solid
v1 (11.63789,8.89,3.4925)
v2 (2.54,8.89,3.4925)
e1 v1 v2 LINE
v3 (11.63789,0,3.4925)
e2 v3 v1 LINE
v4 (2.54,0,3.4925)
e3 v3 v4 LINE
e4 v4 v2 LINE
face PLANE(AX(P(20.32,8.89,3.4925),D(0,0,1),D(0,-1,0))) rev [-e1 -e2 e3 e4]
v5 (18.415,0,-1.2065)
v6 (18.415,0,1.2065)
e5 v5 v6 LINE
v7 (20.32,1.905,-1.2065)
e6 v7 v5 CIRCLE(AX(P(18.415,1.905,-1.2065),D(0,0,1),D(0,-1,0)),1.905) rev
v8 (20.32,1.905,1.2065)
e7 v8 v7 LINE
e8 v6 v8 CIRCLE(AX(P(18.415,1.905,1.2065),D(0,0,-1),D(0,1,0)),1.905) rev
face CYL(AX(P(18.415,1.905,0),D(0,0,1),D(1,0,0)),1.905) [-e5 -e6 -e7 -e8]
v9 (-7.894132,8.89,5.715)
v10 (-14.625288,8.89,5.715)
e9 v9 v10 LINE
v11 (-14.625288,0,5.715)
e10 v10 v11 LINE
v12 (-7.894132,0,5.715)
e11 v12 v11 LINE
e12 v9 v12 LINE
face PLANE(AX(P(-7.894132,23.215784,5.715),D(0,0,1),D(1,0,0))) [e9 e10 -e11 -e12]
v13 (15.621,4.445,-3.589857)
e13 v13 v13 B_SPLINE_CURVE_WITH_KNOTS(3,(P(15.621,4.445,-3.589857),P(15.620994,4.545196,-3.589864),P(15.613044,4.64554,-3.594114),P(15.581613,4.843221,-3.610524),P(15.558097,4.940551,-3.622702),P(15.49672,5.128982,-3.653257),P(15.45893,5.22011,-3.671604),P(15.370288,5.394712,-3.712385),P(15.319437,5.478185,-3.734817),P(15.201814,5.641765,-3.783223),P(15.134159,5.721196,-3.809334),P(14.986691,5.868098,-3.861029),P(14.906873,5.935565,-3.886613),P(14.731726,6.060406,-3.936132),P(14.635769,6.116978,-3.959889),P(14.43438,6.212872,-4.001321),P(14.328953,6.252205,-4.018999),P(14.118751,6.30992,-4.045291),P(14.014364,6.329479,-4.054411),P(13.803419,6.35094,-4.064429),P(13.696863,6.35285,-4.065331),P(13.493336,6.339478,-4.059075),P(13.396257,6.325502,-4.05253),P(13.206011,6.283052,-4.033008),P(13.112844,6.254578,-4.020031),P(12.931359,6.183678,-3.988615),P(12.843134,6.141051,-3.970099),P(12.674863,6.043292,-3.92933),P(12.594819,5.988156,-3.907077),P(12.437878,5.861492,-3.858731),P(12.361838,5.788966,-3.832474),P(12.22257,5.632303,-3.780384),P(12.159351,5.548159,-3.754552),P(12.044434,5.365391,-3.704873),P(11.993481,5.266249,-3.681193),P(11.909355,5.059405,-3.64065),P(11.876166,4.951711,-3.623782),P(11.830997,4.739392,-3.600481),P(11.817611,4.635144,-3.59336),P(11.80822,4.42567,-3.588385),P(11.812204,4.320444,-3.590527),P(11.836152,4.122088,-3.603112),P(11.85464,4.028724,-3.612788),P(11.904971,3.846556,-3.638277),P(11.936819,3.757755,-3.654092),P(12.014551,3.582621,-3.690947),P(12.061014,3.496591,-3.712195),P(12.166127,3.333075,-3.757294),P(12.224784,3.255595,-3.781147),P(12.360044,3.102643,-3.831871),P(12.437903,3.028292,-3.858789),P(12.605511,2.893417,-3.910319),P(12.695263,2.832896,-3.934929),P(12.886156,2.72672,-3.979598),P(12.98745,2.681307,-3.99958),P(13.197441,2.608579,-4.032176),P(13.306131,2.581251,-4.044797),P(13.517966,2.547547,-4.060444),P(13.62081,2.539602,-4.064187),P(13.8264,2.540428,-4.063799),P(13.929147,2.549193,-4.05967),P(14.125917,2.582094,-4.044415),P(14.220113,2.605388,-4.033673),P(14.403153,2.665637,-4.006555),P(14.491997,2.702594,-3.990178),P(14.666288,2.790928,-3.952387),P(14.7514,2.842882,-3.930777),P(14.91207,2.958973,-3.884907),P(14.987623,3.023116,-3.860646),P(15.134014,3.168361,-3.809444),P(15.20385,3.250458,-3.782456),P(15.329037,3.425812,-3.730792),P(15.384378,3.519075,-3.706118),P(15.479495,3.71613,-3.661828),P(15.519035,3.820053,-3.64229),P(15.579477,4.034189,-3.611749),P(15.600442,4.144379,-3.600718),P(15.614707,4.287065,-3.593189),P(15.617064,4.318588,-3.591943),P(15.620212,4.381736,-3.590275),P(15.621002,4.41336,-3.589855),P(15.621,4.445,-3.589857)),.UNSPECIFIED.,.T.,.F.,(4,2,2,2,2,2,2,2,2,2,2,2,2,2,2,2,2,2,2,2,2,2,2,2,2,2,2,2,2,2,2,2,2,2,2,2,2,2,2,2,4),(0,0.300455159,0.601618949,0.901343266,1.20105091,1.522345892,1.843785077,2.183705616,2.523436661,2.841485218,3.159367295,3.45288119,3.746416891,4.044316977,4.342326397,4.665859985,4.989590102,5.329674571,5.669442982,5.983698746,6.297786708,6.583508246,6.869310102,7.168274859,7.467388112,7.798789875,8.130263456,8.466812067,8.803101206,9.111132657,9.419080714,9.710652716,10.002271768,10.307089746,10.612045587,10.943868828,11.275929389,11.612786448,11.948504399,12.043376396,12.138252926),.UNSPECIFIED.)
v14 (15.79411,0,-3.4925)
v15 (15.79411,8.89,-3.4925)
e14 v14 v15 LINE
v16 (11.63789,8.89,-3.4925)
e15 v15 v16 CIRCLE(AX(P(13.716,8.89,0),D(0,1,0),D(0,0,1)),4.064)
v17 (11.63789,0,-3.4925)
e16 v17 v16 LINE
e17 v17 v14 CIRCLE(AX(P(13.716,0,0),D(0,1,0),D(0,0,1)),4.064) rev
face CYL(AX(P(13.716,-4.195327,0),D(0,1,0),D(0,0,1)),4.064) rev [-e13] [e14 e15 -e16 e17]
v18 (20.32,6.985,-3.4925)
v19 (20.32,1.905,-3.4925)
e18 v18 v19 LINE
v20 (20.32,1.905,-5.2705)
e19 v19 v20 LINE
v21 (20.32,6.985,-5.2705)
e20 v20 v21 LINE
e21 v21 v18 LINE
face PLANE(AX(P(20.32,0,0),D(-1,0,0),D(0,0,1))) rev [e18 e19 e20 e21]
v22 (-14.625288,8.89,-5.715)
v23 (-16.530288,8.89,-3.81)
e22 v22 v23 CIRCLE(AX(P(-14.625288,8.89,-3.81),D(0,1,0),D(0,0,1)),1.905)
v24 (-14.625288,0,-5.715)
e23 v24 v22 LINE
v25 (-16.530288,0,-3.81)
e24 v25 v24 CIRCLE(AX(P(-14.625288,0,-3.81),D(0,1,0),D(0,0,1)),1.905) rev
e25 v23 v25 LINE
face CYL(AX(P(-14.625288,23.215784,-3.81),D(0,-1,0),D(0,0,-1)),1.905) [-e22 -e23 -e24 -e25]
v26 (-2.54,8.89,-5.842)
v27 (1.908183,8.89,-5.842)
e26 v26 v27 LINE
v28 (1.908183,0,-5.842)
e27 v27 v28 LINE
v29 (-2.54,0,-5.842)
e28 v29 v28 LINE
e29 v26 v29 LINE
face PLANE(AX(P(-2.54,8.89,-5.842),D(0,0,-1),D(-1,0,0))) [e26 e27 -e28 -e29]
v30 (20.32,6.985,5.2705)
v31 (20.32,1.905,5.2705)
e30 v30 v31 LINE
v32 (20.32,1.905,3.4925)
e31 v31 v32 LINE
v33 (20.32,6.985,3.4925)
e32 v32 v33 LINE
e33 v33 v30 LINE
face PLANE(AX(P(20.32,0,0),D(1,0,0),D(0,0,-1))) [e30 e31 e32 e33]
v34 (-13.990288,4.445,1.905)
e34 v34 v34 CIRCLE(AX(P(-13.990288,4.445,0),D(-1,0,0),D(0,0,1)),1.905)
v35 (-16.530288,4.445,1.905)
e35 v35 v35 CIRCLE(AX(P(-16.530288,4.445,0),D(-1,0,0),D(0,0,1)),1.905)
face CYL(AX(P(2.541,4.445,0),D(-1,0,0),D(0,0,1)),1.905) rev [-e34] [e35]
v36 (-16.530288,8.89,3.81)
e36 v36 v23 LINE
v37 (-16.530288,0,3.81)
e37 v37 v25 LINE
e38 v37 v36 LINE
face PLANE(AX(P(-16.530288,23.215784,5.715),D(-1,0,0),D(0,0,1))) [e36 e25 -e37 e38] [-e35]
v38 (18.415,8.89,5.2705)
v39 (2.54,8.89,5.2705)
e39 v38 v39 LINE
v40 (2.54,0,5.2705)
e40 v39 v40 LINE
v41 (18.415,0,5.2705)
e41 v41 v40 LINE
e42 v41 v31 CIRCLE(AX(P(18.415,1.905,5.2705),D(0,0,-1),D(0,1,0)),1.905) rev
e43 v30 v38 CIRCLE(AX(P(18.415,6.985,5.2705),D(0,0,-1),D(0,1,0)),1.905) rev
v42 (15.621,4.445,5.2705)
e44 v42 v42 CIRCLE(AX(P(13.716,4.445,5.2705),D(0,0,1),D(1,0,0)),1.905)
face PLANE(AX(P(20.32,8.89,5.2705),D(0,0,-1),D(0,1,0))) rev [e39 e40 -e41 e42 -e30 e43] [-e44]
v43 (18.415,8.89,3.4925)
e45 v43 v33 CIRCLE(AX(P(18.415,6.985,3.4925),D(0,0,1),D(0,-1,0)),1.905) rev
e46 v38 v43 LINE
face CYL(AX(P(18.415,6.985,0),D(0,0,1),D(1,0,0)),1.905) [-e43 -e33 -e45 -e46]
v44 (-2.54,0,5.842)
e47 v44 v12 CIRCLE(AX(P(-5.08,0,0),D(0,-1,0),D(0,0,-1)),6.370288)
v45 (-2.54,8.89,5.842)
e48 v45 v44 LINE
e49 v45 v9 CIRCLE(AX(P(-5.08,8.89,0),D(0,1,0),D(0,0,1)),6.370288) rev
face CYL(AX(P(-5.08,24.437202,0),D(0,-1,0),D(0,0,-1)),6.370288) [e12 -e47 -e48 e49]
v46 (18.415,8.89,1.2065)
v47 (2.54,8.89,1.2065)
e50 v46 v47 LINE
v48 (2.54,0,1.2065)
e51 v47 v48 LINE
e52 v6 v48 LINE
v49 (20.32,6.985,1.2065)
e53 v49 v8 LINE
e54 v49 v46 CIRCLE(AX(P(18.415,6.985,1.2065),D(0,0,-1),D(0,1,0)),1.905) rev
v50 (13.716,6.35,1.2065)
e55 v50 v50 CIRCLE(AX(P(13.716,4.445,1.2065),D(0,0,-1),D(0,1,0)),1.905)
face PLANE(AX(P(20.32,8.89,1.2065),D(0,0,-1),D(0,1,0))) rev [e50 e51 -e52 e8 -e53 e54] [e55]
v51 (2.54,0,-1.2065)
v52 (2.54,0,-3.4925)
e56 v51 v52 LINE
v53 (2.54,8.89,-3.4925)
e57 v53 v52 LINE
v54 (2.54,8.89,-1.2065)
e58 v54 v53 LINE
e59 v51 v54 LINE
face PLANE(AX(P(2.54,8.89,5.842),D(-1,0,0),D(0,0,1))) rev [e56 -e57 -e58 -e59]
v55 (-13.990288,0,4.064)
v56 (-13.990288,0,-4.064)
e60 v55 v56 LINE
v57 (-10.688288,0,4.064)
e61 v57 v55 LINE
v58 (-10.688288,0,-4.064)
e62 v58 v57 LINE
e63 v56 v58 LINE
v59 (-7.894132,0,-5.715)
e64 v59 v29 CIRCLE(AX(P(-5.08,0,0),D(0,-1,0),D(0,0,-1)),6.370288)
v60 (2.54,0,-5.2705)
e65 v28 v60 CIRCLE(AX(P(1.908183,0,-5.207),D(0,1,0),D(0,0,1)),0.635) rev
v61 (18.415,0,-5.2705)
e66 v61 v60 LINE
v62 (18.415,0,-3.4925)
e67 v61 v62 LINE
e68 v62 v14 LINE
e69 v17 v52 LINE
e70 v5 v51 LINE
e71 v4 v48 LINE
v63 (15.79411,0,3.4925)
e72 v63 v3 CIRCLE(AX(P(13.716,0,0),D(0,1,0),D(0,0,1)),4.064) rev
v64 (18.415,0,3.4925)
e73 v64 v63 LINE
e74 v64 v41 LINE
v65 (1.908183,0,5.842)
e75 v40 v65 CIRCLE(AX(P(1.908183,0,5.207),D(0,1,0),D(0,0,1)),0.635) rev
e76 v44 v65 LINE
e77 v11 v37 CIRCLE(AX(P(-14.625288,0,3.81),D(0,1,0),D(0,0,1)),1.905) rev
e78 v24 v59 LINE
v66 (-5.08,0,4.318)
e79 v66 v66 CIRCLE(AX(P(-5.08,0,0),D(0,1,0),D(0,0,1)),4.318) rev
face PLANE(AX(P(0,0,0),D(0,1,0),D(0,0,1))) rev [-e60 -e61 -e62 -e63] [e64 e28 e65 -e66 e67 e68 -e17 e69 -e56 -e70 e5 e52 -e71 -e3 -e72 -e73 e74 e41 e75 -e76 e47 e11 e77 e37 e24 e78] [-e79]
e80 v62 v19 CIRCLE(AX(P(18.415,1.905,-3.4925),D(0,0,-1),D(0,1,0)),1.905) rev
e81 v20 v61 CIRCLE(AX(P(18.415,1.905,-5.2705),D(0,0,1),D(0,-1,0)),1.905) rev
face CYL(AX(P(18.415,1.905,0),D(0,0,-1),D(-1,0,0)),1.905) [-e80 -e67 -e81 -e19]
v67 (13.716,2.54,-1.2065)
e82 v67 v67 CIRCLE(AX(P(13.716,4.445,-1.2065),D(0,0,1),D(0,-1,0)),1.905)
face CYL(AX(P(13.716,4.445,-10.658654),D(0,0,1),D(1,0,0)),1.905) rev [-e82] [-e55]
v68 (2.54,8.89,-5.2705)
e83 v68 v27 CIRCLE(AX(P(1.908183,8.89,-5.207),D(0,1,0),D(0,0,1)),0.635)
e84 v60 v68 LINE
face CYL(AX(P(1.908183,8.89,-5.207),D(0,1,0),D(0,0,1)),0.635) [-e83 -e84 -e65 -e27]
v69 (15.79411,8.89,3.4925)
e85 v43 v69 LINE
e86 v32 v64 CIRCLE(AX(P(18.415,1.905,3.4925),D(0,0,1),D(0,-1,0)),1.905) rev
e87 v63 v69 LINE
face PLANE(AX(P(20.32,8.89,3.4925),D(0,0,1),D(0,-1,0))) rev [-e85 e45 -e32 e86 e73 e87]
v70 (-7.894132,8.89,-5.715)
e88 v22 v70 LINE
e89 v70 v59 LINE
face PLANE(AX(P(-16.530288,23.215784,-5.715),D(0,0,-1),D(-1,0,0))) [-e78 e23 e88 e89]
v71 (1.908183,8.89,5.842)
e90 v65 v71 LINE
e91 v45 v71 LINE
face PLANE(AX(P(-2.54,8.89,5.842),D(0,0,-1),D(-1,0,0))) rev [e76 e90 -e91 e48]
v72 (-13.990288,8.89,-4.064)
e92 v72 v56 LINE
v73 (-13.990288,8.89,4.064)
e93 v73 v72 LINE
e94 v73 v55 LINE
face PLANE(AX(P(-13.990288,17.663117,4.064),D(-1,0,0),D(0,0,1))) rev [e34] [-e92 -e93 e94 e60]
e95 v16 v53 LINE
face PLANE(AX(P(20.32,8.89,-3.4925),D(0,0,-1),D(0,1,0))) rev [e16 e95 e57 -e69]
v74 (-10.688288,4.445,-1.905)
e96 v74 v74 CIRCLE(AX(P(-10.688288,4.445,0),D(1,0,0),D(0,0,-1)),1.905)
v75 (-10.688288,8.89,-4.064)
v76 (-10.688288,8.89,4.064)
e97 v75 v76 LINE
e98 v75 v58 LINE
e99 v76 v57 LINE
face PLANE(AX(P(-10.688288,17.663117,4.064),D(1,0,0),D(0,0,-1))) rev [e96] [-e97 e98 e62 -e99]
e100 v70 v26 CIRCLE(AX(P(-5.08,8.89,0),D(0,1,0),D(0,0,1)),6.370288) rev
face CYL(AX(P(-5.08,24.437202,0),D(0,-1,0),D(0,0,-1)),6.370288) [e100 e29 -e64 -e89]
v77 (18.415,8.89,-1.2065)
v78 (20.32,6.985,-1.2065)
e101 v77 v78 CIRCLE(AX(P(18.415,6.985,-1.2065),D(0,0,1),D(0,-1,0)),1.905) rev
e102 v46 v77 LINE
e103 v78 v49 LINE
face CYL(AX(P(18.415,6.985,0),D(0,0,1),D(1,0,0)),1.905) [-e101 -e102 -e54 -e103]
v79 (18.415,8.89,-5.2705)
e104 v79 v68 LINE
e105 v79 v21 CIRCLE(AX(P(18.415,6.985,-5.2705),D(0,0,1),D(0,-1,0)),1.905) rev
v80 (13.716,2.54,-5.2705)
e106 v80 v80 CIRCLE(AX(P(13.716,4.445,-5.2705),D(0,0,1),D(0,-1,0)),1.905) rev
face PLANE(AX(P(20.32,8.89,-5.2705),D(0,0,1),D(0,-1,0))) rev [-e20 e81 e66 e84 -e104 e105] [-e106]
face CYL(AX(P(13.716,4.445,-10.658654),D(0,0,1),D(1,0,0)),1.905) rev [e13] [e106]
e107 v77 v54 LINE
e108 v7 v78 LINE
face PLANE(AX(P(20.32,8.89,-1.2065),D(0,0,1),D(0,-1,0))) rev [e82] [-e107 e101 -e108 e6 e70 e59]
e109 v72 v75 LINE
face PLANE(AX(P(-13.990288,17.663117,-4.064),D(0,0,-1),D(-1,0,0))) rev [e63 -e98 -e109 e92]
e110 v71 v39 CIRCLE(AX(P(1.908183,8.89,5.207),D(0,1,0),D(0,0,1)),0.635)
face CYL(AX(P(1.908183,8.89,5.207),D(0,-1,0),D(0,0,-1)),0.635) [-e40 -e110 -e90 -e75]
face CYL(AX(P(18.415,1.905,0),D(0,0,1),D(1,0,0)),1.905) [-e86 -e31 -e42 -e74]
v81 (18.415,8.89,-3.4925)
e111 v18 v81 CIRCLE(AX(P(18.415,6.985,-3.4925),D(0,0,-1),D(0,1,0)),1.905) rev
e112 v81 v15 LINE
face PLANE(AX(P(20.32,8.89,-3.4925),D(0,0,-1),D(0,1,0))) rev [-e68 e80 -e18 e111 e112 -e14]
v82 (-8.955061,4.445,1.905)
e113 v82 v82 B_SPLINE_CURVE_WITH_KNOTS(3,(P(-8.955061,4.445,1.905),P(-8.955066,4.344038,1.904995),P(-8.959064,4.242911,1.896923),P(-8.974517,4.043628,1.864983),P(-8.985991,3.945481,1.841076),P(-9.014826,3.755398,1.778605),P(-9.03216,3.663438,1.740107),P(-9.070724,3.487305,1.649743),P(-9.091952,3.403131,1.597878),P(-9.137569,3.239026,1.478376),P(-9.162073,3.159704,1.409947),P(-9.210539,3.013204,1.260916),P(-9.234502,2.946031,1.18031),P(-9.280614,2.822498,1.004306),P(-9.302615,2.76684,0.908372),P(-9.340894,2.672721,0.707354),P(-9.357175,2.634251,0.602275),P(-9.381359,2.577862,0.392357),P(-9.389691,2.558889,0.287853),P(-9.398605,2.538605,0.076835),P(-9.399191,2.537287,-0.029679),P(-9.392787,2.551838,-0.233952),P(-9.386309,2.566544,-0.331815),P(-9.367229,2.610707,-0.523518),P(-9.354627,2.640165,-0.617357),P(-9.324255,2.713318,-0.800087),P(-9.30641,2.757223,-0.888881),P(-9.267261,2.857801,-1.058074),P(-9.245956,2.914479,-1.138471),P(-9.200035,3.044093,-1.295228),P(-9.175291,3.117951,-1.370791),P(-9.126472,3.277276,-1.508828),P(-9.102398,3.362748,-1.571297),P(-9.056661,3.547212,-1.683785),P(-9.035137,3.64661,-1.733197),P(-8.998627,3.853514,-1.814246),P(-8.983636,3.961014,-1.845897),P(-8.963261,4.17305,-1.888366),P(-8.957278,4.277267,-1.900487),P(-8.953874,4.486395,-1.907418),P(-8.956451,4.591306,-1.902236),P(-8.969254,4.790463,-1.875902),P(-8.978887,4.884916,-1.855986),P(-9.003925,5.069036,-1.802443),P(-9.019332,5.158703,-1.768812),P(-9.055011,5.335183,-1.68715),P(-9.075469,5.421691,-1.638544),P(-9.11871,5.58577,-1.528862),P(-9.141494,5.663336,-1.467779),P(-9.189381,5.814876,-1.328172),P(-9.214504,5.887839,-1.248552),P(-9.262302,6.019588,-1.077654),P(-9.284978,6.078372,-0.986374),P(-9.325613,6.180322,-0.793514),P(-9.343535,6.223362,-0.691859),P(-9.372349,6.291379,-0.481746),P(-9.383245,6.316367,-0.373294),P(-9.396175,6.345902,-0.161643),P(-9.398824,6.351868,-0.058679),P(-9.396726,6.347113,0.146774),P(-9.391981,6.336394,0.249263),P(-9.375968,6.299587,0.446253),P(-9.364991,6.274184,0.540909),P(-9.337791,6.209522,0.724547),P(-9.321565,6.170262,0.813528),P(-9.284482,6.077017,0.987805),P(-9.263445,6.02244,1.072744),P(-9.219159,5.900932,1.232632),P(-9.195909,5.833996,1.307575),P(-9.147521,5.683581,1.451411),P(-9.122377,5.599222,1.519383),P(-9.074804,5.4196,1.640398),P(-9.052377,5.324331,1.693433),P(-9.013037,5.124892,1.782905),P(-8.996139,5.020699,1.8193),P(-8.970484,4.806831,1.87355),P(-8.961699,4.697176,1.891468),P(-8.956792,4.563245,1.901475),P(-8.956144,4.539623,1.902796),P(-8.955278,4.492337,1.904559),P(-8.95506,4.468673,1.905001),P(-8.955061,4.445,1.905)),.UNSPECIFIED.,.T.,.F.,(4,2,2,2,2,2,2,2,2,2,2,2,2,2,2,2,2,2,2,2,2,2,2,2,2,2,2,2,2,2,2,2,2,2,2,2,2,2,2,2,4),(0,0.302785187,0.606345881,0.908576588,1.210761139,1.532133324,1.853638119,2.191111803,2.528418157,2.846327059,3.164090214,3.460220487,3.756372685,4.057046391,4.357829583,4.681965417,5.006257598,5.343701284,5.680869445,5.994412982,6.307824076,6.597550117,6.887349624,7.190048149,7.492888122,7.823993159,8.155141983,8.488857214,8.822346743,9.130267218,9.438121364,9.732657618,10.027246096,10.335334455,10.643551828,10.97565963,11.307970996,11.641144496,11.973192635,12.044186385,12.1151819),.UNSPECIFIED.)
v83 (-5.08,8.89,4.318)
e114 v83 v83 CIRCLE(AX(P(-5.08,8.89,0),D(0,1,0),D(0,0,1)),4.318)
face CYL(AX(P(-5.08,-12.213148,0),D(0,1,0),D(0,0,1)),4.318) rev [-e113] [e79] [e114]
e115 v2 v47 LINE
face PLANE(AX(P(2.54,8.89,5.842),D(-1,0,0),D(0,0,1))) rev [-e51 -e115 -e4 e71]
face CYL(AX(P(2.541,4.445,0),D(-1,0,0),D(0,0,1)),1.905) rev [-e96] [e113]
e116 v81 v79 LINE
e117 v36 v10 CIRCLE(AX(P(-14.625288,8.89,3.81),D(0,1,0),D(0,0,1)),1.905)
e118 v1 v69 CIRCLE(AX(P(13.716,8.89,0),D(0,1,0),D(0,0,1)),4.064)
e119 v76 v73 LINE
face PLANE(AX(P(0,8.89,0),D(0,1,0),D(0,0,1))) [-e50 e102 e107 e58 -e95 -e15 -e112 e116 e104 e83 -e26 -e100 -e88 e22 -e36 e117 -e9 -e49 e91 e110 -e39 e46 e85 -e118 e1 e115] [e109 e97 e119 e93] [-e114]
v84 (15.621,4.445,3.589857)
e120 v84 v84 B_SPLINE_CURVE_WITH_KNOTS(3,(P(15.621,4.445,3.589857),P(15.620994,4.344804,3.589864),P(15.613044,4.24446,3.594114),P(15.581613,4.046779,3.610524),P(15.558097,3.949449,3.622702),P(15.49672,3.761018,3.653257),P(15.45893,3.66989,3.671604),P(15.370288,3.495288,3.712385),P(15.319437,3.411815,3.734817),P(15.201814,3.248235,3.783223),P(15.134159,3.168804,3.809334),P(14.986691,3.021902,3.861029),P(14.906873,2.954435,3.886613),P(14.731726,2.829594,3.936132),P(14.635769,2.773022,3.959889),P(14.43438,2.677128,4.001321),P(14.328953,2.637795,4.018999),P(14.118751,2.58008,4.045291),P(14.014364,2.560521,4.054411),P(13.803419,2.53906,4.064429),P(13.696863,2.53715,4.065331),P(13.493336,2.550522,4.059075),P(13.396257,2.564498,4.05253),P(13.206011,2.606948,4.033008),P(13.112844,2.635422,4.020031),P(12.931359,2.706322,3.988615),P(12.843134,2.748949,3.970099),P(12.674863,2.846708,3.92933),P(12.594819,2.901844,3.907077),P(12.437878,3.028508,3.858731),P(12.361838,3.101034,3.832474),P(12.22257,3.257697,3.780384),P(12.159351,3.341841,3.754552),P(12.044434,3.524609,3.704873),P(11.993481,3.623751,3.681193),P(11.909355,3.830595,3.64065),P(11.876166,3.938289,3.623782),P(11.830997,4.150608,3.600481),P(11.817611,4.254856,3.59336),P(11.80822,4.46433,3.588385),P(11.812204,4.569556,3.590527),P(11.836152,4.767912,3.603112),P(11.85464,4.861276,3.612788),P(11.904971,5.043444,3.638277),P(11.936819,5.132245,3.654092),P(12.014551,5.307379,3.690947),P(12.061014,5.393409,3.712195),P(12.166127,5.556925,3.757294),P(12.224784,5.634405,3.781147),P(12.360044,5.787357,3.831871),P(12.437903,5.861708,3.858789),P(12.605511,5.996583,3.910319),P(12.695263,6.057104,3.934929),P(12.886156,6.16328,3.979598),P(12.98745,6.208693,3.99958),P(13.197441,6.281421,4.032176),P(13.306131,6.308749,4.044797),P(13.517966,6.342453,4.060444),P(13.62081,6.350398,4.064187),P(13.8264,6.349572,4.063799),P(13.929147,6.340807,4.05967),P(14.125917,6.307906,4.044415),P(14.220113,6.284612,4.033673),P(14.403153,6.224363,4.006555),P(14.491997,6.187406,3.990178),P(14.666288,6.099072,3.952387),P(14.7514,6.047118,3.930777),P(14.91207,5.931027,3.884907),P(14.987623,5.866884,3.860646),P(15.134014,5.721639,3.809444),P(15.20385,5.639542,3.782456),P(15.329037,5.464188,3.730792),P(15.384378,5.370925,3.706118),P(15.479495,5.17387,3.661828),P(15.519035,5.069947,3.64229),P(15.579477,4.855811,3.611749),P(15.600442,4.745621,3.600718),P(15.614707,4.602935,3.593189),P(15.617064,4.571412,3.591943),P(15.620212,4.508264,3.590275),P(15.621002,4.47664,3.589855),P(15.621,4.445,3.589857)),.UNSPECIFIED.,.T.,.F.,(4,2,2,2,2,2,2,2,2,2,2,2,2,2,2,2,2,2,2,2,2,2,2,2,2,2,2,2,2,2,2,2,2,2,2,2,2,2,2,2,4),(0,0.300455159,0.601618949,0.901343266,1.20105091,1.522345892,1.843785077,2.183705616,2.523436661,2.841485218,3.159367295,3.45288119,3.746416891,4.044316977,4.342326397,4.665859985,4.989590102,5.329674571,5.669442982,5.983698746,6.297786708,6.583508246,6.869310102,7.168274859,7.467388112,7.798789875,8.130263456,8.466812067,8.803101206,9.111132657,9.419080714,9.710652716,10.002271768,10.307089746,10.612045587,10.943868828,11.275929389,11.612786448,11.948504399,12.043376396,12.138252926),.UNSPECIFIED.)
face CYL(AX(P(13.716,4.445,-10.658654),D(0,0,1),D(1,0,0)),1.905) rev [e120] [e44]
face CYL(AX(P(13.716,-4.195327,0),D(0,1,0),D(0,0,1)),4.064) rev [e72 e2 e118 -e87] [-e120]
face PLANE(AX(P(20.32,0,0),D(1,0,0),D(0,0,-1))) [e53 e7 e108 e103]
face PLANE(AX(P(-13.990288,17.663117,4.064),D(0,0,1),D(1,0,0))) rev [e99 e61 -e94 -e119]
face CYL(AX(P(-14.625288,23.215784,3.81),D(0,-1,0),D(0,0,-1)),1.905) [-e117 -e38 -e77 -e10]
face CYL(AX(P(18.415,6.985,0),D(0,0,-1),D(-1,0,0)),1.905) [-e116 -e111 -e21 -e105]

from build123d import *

# Parameters (mm, degrees)
SKETCH1_W               = 5.08
SKETCH1_H               = 11.684
BOSS_EXTRUDE1_DEPTH     = 8.89
SKETCH2_R               = 4.318
CUT_EXTRUDE1_DEPTH      = 8.89
BOSS_EXTRUDE4_START     = -8.89
BOSS_EXTRUDE4_DEPTH     = 8.89
BOSS_EXTRUDE5_START     = -8.89
BOSS_EXTRUDE5_DEPTH     = 8.89
SKETCH9_W               = 3.302
SKETCH9_H               = 8.128
CUT_EXTRUDE4_DEPTH      = 8.89
CUT_EXTRUDE5_REACH      = 23.984
CUT_EXTRUDE5_END_RADIUS = 4.318
SKETCH10_R              = 1.905
SKETCH11_W              = 2.413
SKETCH11_H              = 8.89
SKETCH11_W_2            = 1.778
BOSS_EXTRUDE6_DEPTH     = 17.78
CUT_EXTRUDE6_REACH      = 27.049
SKETCH12_R              = 1.905
CUT_EXTRUDE7_START      = -8.89
CUT_EXTRUDE7_DEPTH      = 8.89
FILLET3_R               = 0.635
FILLET4_R               = 1.905


with BuildPart() as part:
    # Sketch1 → Boss-Extrude1 (new body)
    with BuildSketch(Plane(origin=(0, 0, 0), x_dir=(1, 0, 0), z_dir=(0, 1, 0))):
        Rectangle(SKETCH1_W, SKETCH1_H)
    extrude(amount=BOSS_EXTRUDE1_DEPTH)

    # Sketch2 → Cut-Extrude1 (cut)
    with BuildSketch(Plane(origin=(0, 8.89, 0), x_dir=(1, 0, 0), z_dir=(0, 1, 0))):
        with Locations((-5.08, 0)):
            Circle(SKETCH2_R)
    extrude(amount=-CUT_EXTRUDE1_DEPTH, mode=Mode.SUBTRACT)

    # Sketch7 → Boss-Extrude4 (add)
    with BuildSketch(Plane.XZ.offset(BOSS_EXTRUDE4_START)):
        with BuildLine():
            Line((-2.54, 3.49192268), (-2.54, 5.842))
            ThreePointArc((-2.54, 5.842), (-11.450287592, 0), (-2.54, -5.842))
            Line((-2.54, -5.842), (-2.54, -3.49192268))
            ThreePointArc((-2.54, -3.49192268), (-9.398, 0), (-2.54, 3.49192268))
        make_face()
    extrude(amount=BOSS_EXTRUDE4_DEPTH)

    # Sketch8 → Boss-Extrude5 (add)
    with BuildSketch(Plane.XZ.offset(BOSS_EXTRUDE5_START)):
        with BuildLine():
            Line((-7.894132015, 5.715), (-16.530287592, 5.715))
            Line((-16.530287592, 5.715), (-16.530287592, -5.715))
            Line((-16.530287592, -5.715), (-7.894132015, -5.715))
            ThreePointArc((-7.894132015, -5.715), (-11.450287592, 0), (-7.894132015, 5.715))
        make_face()
    extrude(amount=BOSS_EXTRUDE5_DEPTH)

    # Sketch9 → Cut-Extrude4 (cut)
    with BuildSketch(Plane.XZ):
        with Locations((-12.339287592, 0)):
            Rectangle(SKETCH9_W, SKETCH9_H)
    extrude(amount=-CUT_EXTRUDE4_DEPTH, mode=Mode.SUBTRACT)

    # Cut-Extrude5: up to this cylinder (the profile starts outside it)
    cut_extrude5_end = Plane(origin=(-5.08, 4.445, 0), z_dir=(0, 1, 0)) * Cylinder(CUT_EXTRUDE5_END_RADIUS, 57.604, mode=Mode.PRIVATE)
    # Sketch10 → Cut-Extrude5 (cut, up to the surface)
    with BuildSketch(Plane.ZY.offset(16.530287592), mode=Mode.PRIVATE) as cut_extrude5_sk1:
        with Locations((0, 4.445)):
            Circle(SKETCH10_R)
    cut_extrude5_tool1 = extrude(cut_extrude5_sk1.sketch, amount=-CUT_EXTRUDE5_REACH, mode=Mode.PRIVATE) - cut_extrude5_end
    add(cut_extrude5_tool1.solids().sort_by_distance((-16.530288, 4.445, 0))[0], mode=Mode.SUBTRACT)

    # Sketch11 → Boss-Extrude6 (add)
    with BuildSketch(Plane(origin=(2.54, 0, 0), x_dir=(0, 0, -1), z_dir=(1, 0, 0))):
        with Locations((0, 4.445)):
            Rectangle(SKETCH11_W, SKETCH11_H)
        with Locations((4.3815, 4.445)):
            Rectangle(SKETCH11_W_2, SKETCH11_H)
        with Locations((-4.3815, 4.445)):
            Rectangle(SKETCH11_W_2, SKETCH11_H)
    extrude(amount=BOSS_EXTRUDE6_DEPTH)

    # Cut-Extrude6: up to this face of the body (flat: up to its plane)
    cut_extrude6_end = Plane(part.part.faces().sort_by_distance((11.43, 4.445, -5.2705))[0])
    # Sketch12 → Cut-Extrude6 (cut, up to the picked face)
    with BuildSketch(Plane.XY.offset(5.2705), mode=Mode.PRIVATE) as cut_extrude6_sk1:
        with Locations((13.716, 4.445)):
            Circle(SKETCH12_R)
    cut_extrude6_tool1 = split(extrude(cut_extrude6_sk1.sketch, amount=-CUT_EXTRUDE6_REACH, mode=Mode.PRIVATE), bisect_by=cut_extrude6_end, keep=Keep.BOTH, mode=Mode.PRIVATE)
    add(cut_extrude6_tool1.solids().sort_by(Axis((13.716, 4.445, 5.2705), (0, 0, -1)))[0], mode=Mode.SUBTRACT)

    # Sketch13 → Cut-Extrude7 (cut)
    with BuildSketch(Plane(origin=(0, 8.89, 0), x_dir=(1, 0, 0), z_dir=(0, 1, 0)).offset(CUT_EXTRUDE7_START)):
        with BuildLine():
            Line((11.637890342, 3.4925), (15.794109658, 3.4925))
            ThreePointArc((15.794109658, 3.4925), (13.716, 4.064), (11.637890342, 3.4925))
        make_face()
        with BuildLine():
            Line((11.637890342, -3.4925), (15.794109658, -3.4925))
            ThreePointArc((15.794109658, -3.4925), (13.716, -4.064), (11.637890342, -3.4925))
        make_face()
    extrude(amount=CUT_EXTRUDE7_DEPTH, mode=Mode.SUBTRACT)

    # Fillet3
    # the kernel refuses this fillet: 0.635 mm, written as the material it takes off along each edge
    with BuildSketch(Plane(origin=(2.54, -1.579542556, -5.842), x_dir=(-1, 0, 0), z_dir=(0, 1, 0))) as fillet3_piece_1:
        with BuildLine():
            CenterArc((0.631817023, 0.635), FILLET3_R, 185.739170477, 84.260829523)
            Line((0, 0.5715), (-0.01263634, 0.57023))
            ThreePointArc((-0.01263634, 0.57023), (-0.0127, 0.28575), (-0.0127, 0))
            Line((-0.0127, 0), (0, -0.0127))
            Line((0, -0.0127), (0.631817023, -0.0127))
            Line((0.631817023, -0.0127), (0.631817023, 0))
        make_face()
    extrude(amount=12.049085113, mode=Mode.SUBTRACT)
    with BuildSketch(Plane(origin=(2.54, -1.579542556, 5.842), x_dir=(-1, 0, 0), z_dir=(0, 1, 0))) as fillet3_piece_2:
        with BuildLine():
            CenterArc((0.631817023, -0.635), FILLET3_R, 90, 84.260829523)
            Line((0, -0.5715), (-0.01263634, -0.57023))
            ThreePointArc((-0.01263634, -0.57023), (-0.0127, -0.28575), (-0.0127, 0))
            Line((-0.0127, 0), (0, 0.0127))
            Line((0, 0.0127), (0.631817023, 0.0127))
            Line((0.631817023, 0.0127), (0.631817023, 0))
        make_face()
    extrude(amount=12.049085113, mode=Mode.SUBTRACT)

    # Fillet4
    fillet4_edges = [part.edges().sort_by_distance(p)[0] for p in [
        (-16.530287592, 4.445, 5.715),
        (-16.530287592, 4.445, -5.715),
        (20.32, 0, 0),
        (20.32, 8.89, 0),
        (20.32, 8.89, -4.3815),
        (20.32, 0, -4.3815),
        (20.32, 0, 4.3815),
        (20.32, 8.89, 4.3815),
    ]]
    fillet(fillet4_edges, radius=FILLET4_R)


solid = part.part
